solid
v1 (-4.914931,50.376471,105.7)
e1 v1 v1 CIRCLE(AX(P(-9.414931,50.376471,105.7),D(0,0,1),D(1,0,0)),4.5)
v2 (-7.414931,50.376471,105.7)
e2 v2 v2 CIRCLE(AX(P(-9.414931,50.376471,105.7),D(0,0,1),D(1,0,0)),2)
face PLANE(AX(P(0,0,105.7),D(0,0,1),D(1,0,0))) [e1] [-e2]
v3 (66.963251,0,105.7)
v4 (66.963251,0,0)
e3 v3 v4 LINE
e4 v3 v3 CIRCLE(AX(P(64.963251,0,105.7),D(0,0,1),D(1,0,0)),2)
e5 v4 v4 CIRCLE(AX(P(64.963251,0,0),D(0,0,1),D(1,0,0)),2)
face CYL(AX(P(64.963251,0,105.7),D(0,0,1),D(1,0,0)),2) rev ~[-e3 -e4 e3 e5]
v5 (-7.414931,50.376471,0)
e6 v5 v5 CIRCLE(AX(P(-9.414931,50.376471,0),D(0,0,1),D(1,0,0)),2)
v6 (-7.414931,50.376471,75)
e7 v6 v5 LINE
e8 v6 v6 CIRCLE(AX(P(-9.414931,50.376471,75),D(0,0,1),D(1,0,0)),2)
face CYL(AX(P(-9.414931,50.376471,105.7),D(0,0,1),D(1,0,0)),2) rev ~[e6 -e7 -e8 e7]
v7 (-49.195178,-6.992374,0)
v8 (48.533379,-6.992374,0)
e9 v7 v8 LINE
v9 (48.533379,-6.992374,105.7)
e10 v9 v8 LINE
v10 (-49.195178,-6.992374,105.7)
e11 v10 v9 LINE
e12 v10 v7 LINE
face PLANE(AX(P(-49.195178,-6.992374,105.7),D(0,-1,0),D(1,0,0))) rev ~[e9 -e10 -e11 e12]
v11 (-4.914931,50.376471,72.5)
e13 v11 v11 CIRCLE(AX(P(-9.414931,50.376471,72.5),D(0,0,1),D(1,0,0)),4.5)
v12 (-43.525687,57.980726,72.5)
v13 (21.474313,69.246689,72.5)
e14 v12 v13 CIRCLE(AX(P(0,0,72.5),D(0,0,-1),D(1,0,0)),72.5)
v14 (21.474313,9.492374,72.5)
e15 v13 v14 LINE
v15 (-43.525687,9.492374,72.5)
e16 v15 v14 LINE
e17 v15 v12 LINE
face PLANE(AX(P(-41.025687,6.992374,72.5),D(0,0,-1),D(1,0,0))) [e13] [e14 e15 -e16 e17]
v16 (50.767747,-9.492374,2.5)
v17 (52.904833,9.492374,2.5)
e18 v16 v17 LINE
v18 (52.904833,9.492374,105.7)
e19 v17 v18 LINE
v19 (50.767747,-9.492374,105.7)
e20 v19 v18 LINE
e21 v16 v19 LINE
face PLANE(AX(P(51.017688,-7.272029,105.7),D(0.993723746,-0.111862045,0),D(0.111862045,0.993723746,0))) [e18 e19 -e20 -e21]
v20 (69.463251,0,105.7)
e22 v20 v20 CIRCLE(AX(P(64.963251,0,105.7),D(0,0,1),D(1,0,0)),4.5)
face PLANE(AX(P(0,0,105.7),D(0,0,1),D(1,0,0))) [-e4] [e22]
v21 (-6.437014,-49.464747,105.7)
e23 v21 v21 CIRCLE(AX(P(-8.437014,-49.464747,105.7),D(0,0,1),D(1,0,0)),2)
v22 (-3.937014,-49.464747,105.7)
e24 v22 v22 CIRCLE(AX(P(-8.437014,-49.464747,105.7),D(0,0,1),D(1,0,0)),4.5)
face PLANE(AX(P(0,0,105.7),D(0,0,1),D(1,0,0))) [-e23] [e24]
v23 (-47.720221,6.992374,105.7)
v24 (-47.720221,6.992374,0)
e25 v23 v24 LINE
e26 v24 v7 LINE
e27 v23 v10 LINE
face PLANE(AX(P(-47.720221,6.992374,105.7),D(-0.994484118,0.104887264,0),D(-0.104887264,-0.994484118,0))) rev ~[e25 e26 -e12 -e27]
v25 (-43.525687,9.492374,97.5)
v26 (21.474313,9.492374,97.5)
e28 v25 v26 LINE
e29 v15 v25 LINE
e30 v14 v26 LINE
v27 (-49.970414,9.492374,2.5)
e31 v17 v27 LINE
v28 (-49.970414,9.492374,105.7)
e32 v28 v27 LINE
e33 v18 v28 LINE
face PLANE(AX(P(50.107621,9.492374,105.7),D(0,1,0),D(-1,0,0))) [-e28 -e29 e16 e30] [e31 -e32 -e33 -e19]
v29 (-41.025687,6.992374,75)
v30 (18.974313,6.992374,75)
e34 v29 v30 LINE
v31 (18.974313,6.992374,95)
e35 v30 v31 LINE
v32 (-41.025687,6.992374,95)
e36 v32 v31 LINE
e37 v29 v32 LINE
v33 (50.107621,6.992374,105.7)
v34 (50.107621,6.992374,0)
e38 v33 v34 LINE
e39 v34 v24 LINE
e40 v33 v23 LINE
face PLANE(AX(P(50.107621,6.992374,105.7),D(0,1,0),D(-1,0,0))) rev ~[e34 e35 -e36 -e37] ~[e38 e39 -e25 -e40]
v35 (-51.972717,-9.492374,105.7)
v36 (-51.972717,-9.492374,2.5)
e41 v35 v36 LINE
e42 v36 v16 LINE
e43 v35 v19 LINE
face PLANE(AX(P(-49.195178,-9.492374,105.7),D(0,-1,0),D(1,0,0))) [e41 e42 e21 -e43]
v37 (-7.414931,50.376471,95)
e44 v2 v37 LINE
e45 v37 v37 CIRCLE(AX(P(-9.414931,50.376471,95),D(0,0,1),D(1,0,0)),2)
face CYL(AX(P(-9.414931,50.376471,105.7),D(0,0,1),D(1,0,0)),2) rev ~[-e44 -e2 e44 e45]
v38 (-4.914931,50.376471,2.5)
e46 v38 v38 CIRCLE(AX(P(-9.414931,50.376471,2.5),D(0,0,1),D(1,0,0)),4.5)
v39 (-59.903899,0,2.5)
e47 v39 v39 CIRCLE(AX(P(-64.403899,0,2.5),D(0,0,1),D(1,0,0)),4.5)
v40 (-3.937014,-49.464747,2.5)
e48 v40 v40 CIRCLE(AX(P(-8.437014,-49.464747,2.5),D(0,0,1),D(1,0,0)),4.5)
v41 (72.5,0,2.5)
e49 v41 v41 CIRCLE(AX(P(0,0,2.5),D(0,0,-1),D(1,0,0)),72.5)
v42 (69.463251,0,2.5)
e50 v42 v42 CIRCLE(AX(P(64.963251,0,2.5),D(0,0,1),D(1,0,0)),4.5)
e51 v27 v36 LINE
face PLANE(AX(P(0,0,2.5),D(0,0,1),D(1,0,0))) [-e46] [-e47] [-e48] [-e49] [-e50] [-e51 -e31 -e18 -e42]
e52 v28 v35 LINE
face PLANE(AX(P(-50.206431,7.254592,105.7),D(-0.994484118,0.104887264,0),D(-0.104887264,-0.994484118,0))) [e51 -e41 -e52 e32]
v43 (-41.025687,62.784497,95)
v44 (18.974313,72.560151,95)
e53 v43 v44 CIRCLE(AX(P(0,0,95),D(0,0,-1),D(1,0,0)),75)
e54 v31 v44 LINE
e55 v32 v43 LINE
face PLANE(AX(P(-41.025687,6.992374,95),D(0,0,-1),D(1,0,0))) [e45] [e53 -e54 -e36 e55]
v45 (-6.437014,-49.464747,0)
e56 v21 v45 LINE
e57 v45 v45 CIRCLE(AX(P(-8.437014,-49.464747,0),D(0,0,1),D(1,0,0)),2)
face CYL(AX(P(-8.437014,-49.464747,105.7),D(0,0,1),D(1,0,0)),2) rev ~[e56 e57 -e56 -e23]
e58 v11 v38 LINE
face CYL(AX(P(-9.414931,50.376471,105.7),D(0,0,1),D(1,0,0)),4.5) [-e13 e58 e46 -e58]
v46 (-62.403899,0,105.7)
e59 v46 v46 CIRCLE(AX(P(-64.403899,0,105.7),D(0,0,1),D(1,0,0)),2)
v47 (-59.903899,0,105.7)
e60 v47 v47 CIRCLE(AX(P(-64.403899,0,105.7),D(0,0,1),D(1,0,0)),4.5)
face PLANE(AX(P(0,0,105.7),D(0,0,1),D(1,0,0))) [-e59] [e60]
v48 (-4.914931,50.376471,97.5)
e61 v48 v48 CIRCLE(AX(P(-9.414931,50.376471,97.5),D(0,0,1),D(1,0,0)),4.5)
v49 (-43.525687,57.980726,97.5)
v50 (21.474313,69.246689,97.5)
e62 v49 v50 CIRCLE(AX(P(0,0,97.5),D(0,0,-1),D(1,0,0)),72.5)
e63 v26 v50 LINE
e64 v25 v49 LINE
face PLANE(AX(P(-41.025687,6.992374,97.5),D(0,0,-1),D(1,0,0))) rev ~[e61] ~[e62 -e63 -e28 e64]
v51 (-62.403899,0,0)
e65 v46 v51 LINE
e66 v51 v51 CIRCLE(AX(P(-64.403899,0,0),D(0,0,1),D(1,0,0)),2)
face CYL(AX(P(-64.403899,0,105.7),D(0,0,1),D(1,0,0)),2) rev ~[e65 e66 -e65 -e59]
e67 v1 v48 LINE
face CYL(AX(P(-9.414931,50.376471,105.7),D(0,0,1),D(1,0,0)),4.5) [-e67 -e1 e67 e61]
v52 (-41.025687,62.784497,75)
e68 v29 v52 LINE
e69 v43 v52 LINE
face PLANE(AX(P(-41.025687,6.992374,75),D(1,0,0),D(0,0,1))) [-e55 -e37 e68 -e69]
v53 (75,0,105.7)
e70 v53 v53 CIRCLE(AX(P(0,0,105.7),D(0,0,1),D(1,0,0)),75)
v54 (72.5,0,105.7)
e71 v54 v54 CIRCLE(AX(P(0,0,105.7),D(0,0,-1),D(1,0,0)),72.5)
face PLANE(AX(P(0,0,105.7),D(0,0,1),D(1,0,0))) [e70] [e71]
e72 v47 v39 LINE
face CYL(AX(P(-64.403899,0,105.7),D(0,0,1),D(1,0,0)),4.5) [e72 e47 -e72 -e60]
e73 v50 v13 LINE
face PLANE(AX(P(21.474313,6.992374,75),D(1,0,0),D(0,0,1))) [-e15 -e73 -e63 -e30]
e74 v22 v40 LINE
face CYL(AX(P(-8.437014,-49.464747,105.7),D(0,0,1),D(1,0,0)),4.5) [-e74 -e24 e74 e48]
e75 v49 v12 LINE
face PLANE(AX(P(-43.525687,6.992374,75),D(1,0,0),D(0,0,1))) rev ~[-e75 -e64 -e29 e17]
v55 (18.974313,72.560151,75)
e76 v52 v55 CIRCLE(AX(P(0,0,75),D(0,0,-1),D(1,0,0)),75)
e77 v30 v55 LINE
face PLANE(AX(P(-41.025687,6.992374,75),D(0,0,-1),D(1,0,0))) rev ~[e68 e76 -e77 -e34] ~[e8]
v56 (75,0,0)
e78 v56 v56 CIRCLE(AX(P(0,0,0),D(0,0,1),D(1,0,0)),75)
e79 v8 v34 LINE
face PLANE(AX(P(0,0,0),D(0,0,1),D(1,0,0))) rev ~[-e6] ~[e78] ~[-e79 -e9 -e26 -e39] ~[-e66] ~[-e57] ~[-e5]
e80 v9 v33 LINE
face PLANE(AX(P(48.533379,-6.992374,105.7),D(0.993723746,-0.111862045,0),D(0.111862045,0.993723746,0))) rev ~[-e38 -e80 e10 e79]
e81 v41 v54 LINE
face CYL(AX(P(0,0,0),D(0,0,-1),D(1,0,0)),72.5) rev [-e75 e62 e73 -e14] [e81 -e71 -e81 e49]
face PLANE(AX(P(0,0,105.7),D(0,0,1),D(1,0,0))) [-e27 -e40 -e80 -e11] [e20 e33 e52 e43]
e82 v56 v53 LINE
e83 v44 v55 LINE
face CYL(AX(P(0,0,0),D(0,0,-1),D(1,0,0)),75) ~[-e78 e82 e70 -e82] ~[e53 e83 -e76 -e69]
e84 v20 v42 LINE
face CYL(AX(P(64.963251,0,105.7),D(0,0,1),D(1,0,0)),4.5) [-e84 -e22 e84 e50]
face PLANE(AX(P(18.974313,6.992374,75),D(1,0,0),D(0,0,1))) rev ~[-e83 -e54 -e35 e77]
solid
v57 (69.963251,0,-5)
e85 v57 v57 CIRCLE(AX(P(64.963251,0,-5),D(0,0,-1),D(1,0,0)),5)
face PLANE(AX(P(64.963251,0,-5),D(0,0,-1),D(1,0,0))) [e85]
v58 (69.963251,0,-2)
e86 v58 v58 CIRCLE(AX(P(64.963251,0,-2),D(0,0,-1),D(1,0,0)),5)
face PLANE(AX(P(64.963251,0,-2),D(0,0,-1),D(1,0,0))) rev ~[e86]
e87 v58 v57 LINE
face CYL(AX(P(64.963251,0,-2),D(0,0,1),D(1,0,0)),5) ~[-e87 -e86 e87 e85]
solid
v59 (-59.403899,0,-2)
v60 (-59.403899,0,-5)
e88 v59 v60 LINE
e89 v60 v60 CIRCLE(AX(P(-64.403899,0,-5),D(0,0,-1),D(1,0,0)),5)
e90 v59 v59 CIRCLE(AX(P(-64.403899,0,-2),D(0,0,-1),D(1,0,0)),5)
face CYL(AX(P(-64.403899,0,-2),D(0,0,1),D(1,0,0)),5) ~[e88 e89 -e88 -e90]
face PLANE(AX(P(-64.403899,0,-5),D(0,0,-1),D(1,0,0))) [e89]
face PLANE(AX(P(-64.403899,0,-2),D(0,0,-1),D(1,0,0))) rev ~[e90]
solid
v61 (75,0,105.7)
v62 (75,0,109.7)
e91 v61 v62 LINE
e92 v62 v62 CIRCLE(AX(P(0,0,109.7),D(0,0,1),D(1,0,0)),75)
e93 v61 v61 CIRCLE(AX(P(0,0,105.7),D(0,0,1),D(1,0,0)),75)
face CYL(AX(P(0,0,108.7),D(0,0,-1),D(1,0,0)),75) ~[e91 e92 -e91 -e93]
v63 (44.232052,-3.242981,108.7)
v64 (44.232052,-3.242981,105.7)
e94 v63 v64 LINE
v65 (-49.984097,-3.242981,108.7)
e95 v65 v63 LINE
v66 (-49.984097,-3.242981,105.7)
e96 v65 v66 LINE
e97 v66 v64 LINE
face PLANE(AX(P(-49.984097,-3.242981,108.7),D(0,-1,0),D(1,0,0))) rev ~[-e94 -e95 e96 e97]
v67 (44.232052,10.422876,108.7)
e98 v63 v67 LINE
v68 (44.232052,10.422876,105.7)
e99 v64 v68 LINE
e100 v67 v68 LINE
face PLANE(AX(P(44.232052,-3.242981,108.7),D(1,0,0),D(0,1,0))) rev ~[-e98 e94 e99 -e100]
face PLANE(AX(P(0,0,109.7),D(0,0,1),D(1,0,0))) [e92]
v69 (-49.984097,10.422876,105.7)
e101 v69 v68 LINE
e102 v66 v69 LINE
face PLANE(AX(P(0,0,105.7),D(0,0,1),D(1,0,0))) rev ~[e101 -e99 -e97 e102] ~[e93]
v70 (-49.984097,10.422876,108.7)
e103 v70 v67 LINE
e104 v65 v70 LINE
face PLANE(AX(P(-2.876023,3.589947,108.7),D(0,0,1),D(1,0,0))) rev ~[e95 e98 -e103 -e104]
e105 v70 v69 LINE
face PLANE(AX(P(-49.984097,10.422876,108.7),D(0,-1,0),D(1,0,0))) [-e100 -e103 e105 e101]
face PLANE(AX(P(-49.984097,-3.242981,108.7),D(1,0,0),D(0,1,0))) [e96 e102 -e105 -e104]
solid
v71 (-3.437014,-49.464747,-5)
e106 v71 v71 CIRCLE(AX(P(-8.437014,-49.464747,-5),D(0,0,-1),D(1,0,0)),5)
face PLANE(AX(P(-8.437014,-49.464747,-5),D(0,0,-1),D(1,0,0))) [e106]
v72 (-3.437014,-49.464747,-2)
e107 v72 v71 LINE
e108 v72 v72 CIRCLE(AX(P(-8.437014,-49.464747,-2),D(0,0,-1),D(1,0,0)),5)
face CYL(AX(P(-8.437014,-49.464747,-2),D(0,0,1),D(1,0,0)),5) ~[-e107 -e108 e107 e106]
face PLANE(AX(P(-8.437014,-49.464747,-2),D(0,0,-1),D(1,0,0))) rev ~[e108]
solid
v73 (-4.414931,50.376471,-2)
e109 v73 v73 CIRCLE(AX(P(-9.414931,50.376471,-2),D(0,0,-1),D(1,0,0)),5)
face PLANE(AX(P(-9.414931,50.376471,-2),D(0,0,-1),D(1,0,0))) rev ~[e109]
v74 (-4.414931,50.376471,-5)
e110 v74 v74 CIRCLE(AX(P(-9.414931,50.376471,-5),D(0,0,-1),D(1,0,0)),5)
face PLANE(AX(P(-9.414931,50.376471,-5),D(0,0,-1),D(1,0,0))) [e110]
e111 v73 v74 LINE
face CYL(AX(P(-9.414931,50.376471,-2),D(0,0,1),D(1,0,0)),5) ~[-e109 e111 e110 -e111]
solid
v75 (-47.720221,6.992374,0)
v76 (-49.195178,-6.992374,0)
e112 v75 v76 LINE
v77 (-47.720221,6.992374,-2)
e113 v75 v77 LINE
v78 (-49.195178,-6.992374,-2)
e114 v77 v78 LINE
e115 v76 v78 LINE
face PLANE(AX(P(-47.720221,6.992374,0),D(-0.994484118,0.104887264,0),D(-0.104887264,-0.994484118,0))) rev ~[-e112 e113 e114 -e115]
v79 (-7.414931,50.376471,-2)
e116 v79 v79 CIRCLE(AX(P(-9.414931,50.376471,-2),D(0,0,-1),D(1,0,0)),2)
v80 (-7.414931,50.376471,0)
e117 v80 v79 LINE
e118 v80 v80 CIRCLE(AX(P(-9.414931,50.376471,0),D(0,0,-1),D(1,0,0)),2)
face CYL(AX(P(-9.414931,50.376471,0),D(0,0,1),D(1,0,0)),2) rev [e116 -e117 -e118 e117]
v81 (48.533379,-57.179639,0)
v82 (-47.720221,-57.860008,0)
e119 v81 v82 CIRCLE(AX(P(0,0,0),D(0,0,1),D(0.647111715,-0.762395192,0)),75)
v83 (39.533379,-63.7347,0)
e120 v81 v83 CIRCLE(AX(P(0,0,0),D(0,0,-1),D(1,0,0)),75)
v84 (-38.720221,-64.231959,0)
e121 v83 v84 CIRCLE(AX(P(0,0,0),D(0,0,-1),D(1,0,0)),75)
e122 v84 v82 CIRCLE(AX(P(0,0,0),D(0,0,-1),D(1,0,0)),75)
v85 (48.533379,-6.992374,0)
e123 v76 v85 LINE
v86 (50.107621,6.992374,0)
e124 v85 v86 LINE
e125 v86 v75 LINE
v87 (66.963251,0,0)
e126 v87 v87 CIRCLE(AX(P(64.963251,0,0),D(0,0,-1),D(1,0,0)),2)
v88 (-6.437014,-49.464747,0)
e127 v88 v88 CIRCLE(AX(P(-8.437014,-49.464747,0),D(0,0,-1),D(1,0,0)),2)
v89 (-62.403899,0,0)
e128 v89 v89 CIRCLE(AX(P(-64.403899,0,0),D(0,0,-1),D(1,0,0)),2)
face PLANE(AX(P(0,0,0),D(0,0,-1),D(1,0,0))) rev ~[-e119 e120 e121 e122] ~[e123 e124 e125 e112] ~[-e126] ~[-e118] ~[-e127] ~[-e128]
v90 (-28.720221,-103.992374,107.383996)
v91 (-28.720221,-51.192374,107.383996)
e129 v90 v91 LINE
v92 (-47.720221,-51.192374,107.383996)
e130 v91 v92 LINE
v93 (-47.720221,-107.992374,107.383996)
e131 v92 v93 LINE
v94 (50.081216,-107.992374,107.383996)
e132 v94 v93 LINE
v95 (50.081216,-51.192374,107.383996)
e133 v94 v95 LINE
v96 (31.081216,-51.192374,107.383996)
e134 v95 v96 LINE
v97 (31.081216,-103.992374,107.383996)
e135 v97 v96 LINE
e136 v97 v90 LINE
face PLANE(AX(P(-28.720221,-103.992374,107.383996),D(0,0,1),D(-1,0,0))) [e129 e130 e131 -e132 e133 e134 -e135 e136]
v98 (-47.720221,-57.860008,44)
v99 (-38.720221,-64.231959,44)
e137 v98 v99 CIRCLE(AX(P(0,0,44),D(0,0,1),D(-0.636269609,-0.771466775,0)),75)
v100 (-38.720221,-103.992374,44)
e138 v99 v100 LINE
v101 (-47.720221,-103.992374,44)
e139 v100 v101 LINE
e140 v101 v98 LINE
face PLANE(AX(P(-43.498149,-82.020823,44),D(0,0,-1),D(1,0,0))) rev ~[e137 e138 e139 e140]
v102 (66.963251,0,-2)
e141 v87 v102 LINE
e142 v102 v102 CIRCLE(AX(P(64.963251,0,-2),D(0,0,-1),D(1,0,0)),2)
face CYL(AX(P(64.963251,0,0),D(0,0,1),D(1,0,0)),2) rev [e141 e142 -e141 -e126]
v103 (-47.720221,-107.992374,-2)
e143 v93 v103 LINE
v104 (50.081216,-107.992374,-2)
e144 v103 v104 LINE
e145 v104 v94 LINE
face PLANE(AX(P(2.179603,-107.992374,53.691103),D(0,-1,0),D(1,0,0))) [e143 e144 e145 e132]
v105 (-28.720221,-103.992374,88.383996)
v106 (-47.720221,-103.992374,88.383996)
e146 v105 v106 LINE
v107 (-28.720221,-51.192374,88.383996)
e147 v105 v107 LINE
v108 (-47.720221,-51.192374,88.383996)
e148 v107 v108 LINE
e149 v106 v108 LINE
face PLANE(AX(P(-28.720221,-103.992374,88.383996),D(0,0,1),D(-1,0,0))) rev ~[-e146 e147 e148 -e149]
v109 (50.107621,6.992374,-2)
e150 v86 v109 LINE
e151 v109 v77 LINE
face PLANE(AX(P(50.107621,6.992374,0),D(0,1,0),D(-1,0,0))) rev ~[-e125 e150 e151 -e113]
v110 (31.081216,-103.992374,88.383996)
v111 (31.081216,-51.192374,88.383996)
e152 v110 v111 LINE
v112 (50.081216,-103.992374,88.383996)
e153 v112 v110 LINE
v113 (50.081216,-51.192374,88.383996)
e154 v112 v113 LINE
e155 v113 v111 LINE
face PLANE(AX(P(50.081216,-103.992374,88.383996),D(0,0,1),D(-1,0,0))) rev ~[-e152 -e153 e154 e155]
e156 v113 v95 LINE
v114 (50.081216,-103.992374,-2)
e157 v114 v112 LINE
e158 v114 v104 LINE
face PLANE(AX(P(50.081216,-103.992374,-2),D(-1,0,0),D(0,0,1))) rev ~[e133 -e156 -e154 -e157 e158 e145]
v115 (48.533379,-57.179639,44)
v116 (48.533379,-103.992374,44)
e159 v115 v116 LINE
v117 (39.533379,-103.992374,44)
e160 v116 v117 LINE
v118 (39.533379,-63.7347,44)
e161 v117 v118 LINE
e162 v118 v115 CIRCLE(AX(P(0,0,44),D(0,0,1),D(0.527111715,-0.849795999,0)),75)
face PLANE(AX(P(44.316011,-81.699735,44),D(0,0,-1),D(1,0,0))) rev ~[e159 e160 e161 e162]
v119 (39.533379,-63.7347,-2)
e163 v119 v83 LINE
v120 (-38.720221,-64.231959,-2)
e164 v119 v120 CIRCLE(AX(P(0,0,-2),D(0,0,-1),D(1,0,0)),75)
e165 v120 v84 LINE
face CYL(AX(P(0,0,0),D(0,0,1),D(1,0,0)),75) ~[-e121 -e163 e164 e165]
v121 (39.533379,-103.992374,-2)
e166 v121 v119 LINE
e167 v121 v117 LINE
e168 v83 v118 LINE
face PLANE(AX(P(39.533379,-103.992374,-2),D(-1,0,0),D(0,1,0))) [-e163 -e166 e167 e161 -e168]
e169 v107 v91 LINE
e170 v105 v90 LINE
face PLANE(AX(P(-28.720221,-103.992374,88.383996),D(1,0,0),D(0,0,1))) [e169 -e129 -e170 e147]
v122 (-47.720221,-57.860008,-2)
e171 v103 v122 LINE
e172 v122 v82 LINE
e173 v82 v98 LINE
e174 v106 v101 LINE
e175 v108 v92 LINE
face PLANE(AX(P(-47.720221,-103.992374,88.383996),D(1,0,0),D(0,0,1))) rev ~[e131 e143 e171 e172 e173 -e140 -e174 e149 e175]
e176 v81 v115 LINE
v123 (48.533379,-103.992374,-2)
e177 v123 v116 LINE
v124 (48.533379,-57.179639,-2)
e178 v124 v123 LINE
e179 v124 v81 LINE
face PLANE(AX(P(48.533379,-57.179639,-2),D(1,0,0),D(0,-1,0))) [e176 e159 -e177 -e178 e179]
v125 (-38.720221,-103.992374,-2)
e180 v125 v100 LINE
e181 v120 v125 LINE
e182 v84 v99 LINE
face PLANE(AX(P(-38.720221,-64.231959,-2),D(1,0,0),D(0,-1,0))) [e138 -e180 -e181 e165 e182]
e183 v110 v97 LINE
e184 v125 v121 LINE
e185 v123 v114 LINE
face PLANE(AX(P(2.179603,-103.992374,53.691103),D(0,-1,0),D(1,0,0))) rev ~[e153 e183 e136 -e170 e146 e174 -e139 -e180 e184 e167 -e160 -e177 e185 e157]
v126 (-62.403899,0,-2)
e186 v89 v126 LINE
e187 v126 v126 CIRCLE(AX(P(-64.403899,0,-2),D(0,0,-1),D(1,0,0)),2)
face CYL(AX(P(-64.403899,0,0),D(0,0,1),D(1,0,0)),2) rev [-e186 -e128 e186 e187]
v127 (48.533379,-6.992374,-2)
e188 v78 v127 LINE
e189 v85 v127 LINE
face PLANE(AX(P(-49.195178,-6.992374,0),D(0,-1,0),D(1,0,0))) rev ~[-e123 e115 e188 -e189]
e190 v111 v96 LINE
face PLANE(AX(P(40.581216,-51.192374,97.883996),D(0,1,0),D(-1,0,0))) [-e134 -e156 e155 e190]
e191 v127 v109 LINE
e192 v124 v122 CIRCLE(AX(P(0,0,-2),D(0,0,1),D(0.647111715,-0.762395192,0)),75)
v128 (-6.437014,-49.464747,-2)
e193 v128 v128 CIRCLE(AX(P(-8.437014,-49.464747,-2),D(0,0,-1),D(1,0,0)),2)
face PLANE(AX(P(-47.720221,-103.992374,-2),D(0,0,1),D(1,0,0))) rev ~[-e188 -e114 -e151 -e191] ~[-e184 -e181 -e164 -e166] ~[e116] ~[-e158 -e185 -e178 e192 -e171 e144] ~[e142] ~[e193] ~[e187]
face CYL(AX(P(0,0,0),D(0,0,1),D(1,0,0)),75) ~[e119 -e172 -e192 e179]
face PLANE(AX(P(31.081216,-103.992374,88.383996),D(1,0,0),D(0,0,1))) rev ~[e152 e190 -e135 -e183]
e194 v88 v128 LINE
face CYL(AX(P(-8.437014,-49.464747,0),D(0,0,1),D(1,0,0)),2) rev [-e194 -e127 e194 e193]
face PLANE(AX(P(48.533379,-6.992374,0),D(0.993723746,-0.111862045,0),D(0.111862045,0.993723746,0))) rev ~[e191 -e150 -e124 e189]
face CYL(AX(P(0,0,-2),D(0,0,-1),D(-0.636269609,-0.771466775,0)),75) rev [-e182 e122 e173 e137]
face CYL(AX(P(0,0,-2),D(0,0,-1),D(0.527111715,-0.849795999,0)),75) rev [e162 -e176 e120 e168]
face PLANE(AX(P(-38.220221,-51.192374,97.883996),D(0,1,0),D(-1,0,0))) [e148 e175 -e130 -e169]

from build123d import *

# Parameters (mm, degrees)
F0_R       = 75
F1_DEPTH   = 105.7
F3_DEPTH   = 148
F4_R       = 2
F5_DEPTH   = 332
F6_W       = 60
F6_H       = 20
F7_DEPTH   = 89
F8_T       = -2.5
F9_R       = 75
F10_DEPTH  = 3
F11_W      = 94.2161493003
F11_H      = 13.6658572592
F12_DEPTH  = 3
F13_R      = 75
F13_R_2    = 2
F14_DEPTH  = 2
F10_FACE_R = 75
F10_FACE_W = 94.2161493003
F10_FACE_H = 13.6658572592
F15_W      = 94.2161493003
F15_H      = 13.6658572592
F16_DEPTH  = 1
F18_DEPTH  = 46
F19_W      = 9
F19_H      = 46
F20_DEPTH  = 4
F21_R      = 5
F22_DEPTH  = 3
F23_W      = 19
F23_H      = 19
F24_DEPTH  = 52.8


with BuildPart() as f1:
    # F0 (on Top) → F1 (new body)
    with BuildSketch(Plane.XY):
        Circle(F0_R)
    extrude(amount=F1_DEPTH)

    # F2 (on face) → F3 (cut)
    with BuildSketch(Plane.XY.offset(105.7)):
        Polygon((49.3204999983, 0), (0, 0), (-48.457699474, 0), (-49.1951782575, -6.9923736234), (48.5333786124, -6.9923736234), align=None)
        Polygon((-48.457699474, 0), (0, 0), (49.3204999983, 0), (50.1076213842, 6.9923736234), (-47.7202206905, 6.9923736234), align=None)
    extrude(amount=-F3_DEPTH, mode=Mode.SUBTRACT)

    # F4 (on face) → F5 (cut)
    with BuildSketch(Plane.XY.offset(105.7)):
        with Locations((-8.4370141849, -49.4647473097)):
            Circle(F4_R)
        with Locations((-64.403899014, 0)):
            Circle(F4_R)
        with Locations((-9.4149308279, 50.376471132)):
            Circle(F4_R)
        with Locations((64.9632513523, 0)):
            Circle(F4_R)
    extrude(amount=-F5_DEPTH, mode=Mode.SUBTRACT)

    # F6 (on face) → F7 (cut)
    with BuildSketch(Plane.XZ.offset(-6.9923736234)):
        with Locations((-11.0256870091, 85)):
            Rectangle(F6_W, F6_H)
    extrude(amount=-F7_DEPTH, mode=Mode.SUBTRACT)

    # F8
    f8_openings = [f1.faces().sort_by_distance(p)[0] for p in [
        (-72.87868, 0, 105.7),
    ]]
    offset(amount=F8_T, openings=f8_openings, kind=Kind.INTERSECTION)


with BuildPart() as f10:
    # F9 (on face) → F10 (new body)
    with BuildSketch(Plane.XY.offset(105.7)):
        Circle(F9_R)
    extrude(amount=F10_DEPTH)

    # F11 (on face) → F12 (cut)
    with BuildSketch(Plane.XY.offset(108.7)):
        with Locations((-2.8760228306, 3.5899474751)):
            Rectangle(F11_W, F11_H)
    extrude(amount=-F12_DEPTH, mode=Mode.SUBTRACT)

    # F10_face (on face) + F15 (on face) → F16 (join)
    with BuildSketch(Plane.XY.offset(108.7)):
        Circle(F10_FACE_R)
        with Locations((-2.8760228306, 3.5899474751)):
            Rectangle(F10_FACE_W, F10_FACE_H, mode=Mode.SUBTRACT)
    with BuildSketch(Plane.XY.offset(108.7)):
        with Locations((-2.8760228306, 3.5899474751)):
            Rectangle(F15_W, F15_H)
    extrude(amount=F16_DEPTH)


with BuildPart() as f14:
    # F13 (on face) → F14 (new body)
    with BuildSketch(Plane(origin=(0, 0, 0), x_dir=(1, 0, 0), z_dir=(0, 0, -1))):
        Circle(F13_R)
        with Locations((-9.4149308279, -50.376471132)):
            Circle(F13_R_2, mode=Mode.SUBTRACT)
        with Locations((-64.403899014, 0)):
            Circle(F13_R_2, mode=Mode.SUBTRACT)
        with Locations((-8.4370141849, 49.4647473097)):
            Circle(F13_R_2, mode=Mode.SUBTRACT)
        Polygon((-49.1951782575, 6.9923736234), (48.5333786124, 6.9923736234), (50.1076213842, -6.9923736234), (-47.7202206905, -6.9923736234), align=None, mode=Mode.SUBTRACT)
        with Locations((64.9632513523, 0)):
            Circle(F13_R_2, mode=Mode.SUBTRACT)
    extrude(amount=F14_DEPTH)

    # F17 (on face) → F18 (join)
    with BuildSketch(Plane(origin=(0, 0, -2), x_dir=(1, 0, 0), z_dir=(0, 0, -1))):
        with BuildLine():
            ThreePointArc((-47.7202206905, 57.8600080993), (-43.3374885628, 61.2116172394), (-38.7202206905, 64.2319586318))
            Line((-38.7202206905, 64.2319586318), (-38.7202206905, 103.9923736234))
            Line((-38.7202206905, 103.9923736234), (-47.7202206905, 103.9923736234))
            Line((-47.7202206905, 103.9923736234), (-47.7202206905, 57.8600080993))
        make_face()
        with BuildLine():
            ThreePointArc((39.5333786124, 63.7346999325), (44.1551881064, 60.6244122717), (48.5333786124, 57.1796393873))
            Line((48.5333786124, 57.1796393873), (48.5333786124, 103.9923736234))
            Line((48.5333786124, 103.9923736234), (39.5333786124, 103.9923736234))
            Line((39.5333786124, 103.9923736234), (39.5333786124, 63.7346999325))
        make_face()
    extrude(amount=-F18_DEPTH)

    # F19 (on face) → F20 (join)
    with BuildSketch(Plane.XZ.offset(103.9923736234)):
        Polygon((-38.7202206905, 44), (-38.7202206905, -2), (50.0812157989, -2), (50.0812157989, 107.3839962482), (-47.7202206905, 107.3839962482), (-47.7202206905, 44), align=None)
        with Locations((-43.2202206905, 21)):
            Rectangle(F19_W, F19_H)
    extrude(amount=F20_DEPTH)

    # F23 (on face) → F24 (join)
    with BuildSketch(Plane(origin=(0, -103.9923736234, 0), x_dir=(-1, 0, 0), z_dir=(0, 1, 0))):
        with Locations((38.2202206905, 97.8839962482)):
            Rectangle(F23_W, F23_H)
        with Locations((-40.5812157989, 97.8839962482)):
            Rectangle(F23_W, F23_H)
    extrude(amount=F24_DEPTH)


with BuildPart() as f22:
    # F21 (on face) → F22 (new body)
    with BuildSketch(Plane(origin=(0, 0, -2), x_dir=(1, 0, 0), z_dir=(0, 0, -1))):
        with Locations((-9.4149308279, -50.376471132)):
            Circle(F21_R)
    extrude(amount=F22_DEPTH)


with BuildPart() as f22b:
    # F21 (on face) → F22, piece 2 (new body)
    with BuildSketch(Plane(origin=(0, 0, -2), x_dir=(1, 0, 0), z_dir=(0, 0, -1))):
        with Locations((64.9632513523, 0)):
            Circle(F21_R)
    extrude(amount=F22_DEPTH)


with BuildPart() as f22c:
    # F21 (on face) → F22, piece 3 (new body)
    with BuildSketch(Plane(origin=(0, 0, -2), x_dir=(1, 0, 0), z_dir=(0, 0, -1))):
        with Locations((-64.403899014, 0)):
            Circle(F21_R)
    extrude(amount=F22_DEPTH)


with BuildPart() as f22d:
    # F21 (on face) → F22, piece 4 (new body)
    with BuildSketch(Plane(origin=(0, 0, -2), x_dir=(1, 0, 0), z_dir=(0, 0, -1))):
        with Locations((-8.4370141849, 49.4647473097)):
            Circle(F21_R)
    extrude(amount=F22_DEPTH)


solid = Compound([f1.part, f10.part, f14.part, f22.part, f22b.part, f22c.part, f22d.part])
